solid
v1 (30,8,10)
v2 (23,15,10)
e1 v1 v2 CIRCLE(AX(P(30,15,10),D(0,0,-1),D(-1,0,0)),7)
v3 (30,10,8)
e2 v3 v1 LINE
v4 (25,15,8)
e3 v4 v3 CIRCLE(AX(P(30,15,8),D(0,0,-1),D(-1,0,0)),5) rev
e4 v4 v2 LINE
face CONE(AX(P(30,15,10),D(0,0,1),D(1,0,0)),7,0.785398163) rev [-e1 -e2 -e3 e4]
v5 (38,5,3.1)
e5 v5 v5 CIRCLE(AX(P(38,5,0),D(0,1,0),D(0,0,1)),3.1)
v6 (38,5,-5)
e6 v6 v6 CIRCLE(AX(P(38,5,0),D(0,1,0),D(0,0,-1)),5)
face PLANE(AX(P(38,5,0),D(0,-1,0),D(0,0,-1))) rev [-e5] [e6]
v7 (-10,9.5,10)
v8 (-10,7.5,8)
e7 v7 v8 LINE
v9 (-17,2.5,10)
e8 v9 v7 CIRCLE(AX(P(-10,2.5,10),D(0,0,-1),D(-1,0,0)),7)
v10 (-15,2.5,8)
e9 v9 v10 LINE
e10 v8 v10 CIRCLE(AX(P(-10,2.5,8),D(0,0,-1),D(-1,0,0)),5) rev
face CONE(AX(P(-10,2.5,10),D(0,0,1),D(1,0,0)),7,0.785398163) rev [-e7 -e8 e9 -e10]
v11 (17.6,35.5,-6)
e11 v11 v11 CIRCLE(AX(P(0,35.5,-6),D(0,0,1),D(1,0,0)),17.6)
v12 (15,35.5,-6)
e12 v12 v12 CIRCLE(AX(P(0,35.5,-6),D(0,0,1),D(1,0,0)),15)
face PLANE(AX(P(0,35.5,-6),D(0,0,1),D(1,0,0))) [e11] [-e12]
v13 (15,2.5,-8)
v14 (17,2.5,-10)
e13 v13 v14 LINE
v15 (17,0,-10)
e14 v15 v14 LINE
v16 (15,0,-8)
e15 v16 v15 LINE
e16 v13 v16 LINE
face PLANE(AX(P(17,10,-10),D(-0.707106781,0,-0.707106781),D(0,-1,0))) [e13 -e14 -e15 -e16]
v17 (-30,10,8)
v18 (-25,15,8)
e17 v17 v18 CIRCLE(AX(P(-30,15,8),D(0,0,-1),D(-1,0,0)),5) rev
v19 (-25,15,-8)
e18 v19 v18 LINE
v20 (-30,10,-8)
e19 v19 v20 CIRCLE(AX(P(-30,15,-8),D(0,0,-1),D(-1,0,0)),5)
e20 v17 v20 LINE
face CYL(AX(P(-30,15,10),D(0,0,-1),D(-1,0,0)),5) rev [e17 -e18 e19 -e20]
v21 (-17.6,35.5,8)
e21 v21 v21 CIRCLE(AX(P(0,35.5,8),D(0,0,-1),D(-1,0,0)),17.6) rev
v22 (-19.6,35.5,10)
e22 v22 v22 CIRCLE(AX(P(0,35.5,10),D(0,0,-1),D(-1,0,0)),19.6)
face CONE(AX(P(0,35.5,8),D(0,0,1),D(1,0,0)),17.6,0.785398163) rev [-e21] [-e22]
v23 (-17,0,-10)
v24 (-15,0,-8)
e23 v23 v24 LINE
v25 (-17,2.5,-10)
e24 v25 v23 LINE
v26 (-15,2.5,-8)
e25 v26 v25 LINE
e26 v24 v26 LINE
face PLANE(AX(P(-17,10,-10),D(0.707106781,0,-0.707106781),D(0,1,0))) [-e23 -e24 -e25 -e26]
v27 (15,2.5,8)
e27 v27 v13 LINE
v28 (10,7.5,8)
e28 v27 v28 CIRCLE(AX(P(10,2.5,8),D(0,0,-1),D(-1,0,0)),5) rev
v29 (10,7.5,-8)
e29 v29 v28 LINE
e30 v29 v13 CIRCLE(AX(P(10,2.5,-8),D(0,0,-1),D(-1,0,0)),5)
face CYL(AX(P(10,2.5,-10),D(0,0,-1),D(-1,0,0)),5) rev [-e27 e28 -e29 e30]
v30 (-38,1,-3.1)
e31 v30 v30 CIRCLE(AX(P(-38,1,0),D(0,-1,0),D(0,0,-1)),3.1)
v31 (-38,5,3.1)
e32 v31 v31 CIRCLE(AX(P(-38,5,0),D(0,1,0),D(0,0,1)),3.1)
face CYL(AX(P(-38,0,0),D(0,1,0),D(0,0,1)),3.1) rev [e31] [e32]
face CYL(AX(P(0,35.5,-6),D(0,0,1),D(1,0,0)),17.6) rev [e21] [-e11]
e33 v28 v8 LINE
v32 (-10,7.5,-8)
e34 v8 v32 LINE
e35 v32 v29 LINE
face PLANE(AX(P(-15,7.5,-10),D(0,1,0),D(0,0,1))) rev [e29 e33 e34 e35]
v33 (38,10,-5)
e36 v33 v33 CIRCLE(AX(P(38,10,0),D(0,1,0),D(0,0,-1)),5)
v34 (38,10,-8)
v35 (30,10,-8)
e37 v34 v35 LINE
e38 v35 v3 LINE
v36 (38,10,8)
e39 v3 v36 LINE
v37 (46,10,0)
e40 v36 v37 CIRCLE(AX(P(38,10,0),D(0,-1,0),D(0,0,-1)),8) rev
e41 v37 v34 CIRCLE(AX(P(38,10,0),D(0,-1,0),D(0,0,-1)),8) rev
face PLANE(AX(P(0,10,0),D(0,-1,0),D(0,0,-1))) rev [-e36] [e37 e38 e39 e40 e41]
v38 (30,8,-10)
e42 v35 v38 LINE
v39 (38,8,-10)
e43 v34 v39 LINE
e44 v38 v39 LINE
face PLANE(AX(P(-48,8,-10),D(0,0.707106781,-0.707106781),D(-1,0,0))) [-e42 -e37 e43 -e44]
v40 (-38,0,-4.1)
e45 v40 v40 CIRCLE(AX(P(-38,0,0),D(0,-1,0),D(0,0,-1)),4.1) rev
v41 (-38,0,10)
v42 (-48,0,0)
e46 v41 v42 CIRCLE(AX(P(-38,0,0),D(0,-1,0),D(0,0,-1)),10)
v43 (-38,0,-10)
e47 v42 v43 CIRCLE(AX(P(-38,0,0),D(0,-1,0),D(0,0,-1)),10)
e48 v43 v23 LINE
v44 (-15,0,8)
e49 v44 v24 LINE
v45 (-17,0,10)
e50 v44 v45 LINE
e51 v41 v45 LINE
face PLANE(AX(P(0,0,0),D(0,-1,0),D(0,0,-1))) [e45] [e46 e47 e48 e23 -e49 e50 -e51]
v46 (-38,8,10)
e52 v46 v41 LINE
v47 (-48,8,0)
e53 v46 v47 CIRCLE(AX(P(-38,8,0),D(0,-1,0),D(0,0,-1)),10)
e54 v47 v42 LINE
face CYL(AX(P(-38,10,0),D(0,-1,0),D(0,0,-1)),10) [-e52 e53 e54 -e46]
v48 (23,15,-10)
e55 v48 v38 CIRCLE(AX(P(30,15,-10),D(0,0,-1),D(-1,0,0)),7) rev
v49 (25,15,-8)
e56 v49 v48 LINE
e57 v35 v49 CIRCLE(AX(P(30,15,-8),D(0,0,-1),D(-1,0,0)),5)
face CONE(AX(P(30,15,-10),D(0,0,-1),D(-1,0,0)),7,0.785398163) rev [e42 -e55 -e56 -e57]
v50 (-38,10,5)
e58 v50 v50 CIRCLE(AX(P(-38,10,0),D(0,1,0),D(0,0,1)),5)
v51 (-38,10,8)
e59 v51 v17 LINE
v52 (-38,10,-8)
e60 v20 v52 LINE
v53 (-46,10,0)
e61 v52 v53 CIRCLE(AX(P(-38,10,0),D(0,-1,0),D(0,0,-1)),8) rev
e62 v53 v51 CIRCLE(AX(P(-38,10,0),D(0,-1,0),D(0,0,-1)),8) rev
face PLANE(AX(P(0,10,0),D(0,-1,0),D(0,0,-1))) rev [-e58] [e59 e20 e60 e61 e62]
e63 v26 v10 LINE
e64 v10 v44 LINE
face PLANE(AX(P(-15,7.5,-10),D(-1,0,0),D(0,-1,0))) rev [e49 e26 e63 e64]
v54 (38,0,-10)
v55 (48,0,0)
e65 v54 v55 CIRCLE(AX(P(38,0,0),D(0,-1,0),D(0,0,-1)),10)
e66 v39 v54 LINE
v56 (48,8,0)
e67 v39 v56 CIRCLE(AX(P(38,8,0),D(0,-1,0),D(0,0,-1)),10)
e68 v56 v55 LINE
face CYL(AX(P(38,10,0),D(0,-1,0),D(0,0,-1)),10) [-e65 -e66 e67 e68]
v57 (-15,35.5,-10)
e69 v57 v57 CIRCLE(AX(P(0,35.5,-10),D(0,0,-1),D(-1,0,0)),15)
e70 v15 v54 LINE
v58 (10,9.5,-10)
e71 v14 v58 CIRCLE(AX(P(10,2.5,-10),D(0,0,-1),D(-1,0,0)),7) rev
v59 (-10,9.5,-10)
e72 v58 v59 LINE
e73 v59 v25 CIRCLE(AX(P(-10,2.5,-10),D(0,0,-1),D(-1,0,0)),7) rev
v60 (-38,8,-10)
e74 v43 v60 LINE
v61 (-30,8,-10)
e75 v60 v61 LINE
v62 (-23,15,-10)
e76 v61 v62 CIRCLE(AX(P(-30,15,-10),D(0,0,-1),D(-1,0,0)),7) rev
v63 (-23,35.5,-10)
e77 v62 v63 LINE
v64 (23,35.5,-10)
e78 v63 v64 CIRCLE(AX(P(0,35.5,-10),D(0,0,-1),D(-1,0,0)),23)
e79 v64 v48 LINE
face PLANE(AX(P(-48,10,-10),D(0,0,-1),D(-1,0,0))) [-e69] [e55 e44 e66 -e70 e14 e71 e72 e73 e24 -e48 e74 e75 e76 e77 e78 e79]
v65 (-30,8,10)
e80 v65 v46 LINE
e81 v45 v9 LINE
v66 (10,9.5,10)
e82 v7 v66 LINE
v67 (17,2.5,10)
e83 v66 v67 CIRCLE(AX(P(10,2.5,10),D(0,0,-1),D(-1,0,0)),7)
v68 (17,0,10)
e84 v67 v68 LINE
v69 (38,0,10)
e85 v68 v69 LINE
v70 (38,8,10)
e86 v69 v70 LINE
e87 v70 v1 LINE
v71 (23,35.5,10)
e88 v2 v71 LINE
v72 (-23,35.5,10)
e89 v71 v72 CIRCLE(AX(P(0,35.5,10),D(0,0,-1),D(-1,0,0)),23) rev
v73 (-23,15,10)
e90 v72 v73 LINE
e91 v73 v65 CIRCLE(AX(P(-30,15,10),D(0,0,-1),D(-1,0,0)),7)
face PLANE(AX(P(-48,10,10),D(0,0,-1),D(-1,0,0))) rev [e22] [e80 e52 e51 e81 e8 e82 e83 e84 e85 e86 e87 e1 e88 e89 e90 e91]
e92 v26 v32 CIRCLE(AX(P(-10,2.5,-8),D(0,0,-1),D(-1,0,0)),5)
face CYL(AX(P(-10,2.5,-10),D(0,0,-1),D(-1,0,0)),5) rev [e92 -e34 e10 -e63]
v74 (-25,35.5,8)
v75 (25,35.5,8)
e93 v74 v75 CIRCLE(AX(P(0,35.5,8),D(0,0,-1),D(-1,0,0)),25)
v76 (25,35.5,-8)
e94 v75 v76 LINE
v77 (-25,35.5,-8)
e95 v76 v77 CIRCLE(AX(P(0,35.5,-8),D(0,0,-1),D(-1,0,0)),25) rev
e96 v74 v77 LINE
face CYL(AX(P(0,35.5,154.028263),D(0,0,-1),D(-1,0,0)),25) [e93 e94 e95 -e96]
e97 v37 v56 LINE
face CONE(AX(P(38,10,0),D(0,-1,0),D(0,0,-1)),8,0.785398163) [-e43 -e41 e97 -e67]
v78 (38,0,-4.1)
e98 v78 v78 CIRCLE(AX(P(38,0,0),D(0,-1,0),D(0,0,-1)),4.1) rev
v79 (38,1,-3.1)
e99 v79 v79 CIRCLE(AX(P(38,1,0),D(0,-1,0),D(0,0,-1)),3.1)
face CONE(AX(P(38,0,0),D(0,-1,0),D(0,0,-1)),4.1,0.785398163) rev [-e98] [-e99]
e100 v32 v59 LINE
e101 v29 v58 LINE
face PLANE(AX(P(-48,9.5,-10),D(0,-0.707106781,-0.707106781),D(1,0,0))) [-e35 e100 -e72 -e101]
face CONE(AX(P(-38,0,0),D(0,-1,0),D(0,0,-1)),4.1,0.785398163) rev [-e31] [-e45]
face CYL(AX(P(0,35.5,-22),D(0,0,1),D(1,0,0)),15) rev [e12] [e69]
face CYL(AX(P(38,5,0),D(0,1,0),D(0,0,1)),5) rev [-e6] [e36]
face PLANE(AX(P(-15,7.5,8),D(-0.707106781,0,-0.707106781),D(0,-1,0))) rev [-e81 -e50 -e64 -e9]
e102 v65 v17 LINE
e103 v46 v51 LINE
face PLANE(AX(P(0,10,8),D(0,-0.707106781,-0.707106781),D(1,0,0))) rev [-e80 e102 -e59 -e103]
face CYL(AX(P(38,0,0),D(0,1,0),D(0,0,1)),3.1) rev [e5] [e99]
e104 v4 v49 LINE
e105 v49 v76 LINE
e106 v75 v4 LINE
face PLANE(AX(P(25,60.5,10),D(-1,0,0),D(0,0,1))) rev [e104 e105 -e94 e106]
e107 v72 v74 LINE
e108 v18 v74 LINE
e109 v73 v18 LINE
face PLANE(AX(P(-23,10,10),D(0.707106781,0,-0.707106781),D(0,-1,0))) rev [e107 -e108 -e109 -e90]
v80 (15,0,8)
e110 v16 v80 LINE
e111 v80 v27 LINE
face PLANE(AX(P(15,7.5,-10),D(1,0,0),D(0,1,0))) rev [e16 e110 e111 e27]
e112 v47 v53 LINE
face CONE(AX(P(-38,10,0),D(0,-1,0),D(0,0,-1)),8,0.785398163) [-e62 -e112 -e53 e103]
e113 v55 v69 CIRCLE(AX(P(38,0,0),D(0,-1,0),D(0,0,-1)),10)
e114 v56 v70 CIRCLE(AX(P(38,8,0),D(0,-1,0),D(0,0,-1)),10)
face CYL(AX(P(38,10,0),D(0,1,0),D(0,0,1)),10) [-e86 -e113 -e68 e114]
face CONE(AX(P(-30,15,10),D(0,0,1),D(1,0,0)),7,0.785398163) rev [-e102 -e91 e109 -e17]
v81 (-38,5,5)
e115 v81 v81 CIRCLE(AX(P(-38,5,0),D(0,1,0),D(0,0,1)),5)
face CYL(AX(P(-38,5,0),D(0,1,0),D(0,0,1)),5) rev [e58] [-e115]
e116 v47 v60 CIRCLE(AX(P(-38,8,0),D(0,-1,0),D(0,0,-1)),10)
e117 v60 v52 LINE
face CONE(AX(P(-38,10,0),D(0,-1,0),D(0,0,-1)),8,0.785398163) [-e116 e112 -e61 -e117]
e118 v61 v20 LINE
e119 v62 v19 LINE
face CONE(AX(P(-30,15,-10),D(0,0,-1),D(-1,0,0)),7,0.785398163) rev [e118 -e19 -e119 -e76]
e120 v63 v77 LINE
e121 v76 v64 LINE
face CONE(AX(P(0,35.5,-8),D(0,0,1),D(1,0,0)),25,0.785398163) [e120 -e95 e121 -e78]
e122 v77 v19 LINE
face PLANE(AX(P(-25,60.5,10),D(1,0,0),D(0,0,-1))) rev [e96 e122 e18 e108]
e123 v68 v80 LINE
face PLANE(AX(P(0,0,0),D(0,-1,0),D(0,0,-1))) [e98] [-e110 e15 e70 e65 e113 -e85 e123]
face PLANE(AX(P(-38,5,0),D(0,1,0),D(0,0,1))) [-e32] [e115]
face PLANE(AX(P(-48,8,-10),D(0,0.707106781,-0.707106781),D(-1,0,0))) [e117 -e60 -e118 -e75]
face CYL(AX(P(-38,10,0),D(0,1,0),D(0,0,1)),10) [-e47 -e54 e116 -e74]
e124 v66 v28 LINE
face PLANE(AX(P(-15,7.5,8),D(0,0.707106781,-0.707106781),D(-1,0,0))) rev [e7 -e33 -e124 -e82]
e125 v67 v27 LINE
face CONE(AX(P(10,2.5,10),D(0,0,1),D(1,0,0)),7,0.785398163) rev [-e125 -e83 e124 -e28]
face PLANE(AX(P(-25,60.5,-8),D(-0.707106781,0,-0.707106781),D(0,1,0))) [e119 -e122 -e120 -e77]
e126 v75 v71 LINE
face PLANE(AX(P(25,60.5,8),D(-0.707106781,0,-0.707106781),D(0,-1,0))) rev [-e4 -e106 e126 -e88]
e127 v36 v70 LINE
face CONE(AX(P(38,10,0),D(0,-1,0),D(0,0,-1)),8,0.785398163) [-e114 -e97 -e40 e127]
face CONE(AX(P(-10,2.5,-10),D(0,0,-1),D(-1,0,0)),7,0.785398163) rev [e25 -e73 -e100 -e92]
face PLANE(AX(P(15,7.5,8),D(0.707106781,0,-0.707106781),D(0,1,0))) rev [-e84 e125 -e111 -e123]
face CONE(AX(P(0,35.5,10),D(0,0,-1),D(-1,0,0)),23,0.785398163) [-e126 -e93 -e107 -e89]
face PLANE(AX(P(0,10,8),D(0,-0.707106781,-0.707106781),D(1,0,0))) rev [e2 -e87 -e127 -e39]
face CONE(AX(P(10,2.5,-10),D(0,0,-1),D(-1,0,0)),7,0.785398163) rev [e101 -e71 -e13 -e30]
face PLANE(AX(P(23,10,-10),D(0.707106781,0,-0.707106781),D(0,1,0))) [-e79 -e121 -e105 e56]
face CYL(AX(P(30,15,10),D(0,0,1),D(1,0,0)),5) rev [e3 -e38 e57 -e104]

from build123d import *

# Parameters (mm, degrees)
SKETCH_1_W          = 96
SKETCH_1_H          = 20
EXTRUDE_1_DEPTH     = 10
SKETCH_2_R          = 5
CUT_EXTRUDE_1_DEPTH = 5
FILLET_1_R          = 10
SKETCH_3_R          = 3.1
CUT_EXTRUDE_2_DEPTH = 5
CHAMFER_1_SIZE      = 1
SKETCH_4_W          = 50
SKETCH_4_H          = 20
EXTRUDE_2_DEPTH     = 50.5
CUT_EXTRUDE_START   = -20
CUT_EXTRUDE_4_DEPTH = 20
SKETCH_7_R          = 17.6
CUT_EXTRUDE_5_DEPTH = 16
SKETCH_8_R          = 15
CUT_EXTRUDE_6_DEPTH = 16
CHAMFER_3_SIZE      = 2
FILLET_3_R          = 5
CHAMFER_5_SIZE      = 2
SKETCH_9_W          = 30
SKETCH_9_H          = 15
CUT_EXTRUDE_7_DEPTH = 80.776249598
FILLET_4_R          = 5
CHAMFER_6_SIZE      = 2


# Read off the part's stored shape, not the designer's step: 切除-拉伸4
with BuildPart() as part:
    # 草图1 → 凸台-拉伸1 (new body)
    with BuildSketch(Plane(origin=(0, 0, 0), x_dir=(1, 0, 0), z_dir=(0, 1, 0))):
        Rectangle(SKETCH_1_W, SKETCH_1_H)
    extrude(amount=EXTRUDE_1_DEPTH)

    # 草图2 → 切除-拉伸1 (cut)
    with BuildSketch(Plane(origin=(0, 10, 0), x_dir=(1, 0, 0), z_dir=(0, 1, 0))):
        with Locations(Location((-38, 0, 0), (0, 0, 270))):
            Circle(SKETCH_2_R)
        with Locations(Location((38, 0, 0), (0, 0, 90))):
            Circle(SKETCH_2_R)
    extrude(amount=-CUT_EXTRUDE_1_DEPTH, mode=Mode.SUBTRACT)

    # 圆角1
    fillet_1_edges = [part.edges().sort_by_distance(p)[0] for p in [
        (48, 5, -10),
        (48, 5, 10),
        (-48, 5, 10),
        (-48, 5, -10),
    ]]
    fillet(fillet_1_edges, radius=FILLET_1_R - 0.0001)  # a hair under: the kernel refuses the full size

    # 草图3 → 切除-拉伸2 (cut)
    with BuildSketch(Plane(origin=(0, 5, 0), x_dir=(1, 0, 0), z_dir=(0, 1, 0))):
        with Locations(Location((-38, 0, 0), (0, 0, 270))):
            Circle(SKETCH_3_R)
        with Locations(Location((38, 0, 0), (0, 0, 270))):
            Circle(SKETCH_3_R)
    extrude(amount=-CUT_EXTRUDE_2_DEPTH, mode=Mode.SUBTRACT)

    # 倒角1
    chamfer_1_edges = [part.edges().sort_by_distance(p)[0] for p in [
        (-38, 0, -3.1),
        (38, 0, -3.1),
    ]]
    chamfer(chamfer_1_edges, length=CHAMFER_1_SIZE)

    # 草图4 → 凸台-拉伸2 (add)
    with BuildSketch(Plane(origin=(0, 10, 0), x_dir=(1, 0, 0), z_dir=(0, 1, 0))):
        Rectangle(SKETCH_4_W, SKETCH_4_H)
    extrude(amount=EXTRUDE_2_DEPTH)

    # 切除-拉伸4 outline → 切除-拉伸4 (cut)
    with BuildSketch(Plane.XY.offset(10).offset(CUT_EXTRUDE_START)):
        with BuildLine():
            Line((-25, 60.5), (-25, 35.5))
            ThreePointArc((-25, 35.5), (-17.677669559, 53.1776695), (-8.4e-08, 60.5))
            Line((-8.4e-08, 60.5), (-25, 60.5))
        make_face()
        with BuildLine():
            Line((25, 60.5), (-8.4e-08, 60.5))
            ThreePointArc((-8.4e-08, 60.5), (17.6776695, 53.177669559), (25, 35.5))
            Line((25, 35.5), (25, 60.5))
        make_face()
    extrude(amount=CUT_EXTRUDE_4_DEPTH, mode=Mode.SUBTRACT)

    # 草图7 → 切除-拉伸5 (cut)
    with BuildSketch(Plane.XY.offset(10)):
        with Locations((0, 35.5)):
            Circle(SKETCH_7_R)
    extrude(amount=-CUT_EXTRUDE_5_DEPTH, mode=Mode.SUBTRACT)

    # 草图8 → 切除-拉伸6 (cut)
    with BuildSketch(Plane.XY.offset(-6)):
        with Locations((0, 35.5)):
            Circle(SKETCH_8_R)
    extrude(amount=-CUT_EXTRUDE_6_DEPTH, mode=Mode.SUBTRACT)

    # 倒角3
    chamfer_3_edges = [part.edges().sort_by_distance(p)[0] for p in [
        (-17.6, 35.5, 10),
    ]]
    chamfer(chamfer_3_edges, length=CHAMFER_3_SIZE)

    # 圆角3
    fillet_3_edges = [part.edges().sort_by_distance(p)[0] for p in [
        (25, 10, 0),
        (-25, 10, 0),
    ]]
    fillet(fillet_3_edges, radius=FILLET_3_R)

    # 倒角5
    chamfer_5_edges = [part.edges().sort_by_distance(p)[0] for p in [
        (34.00005, 10, 10),
        (34.00005, 10, -10),
        (26.464466094, 11.464466094, -10),
        (26.464466094, 11.464466094, 10),
        (-26.464466094, 11.464466094, 10),
        (-26.464466094, 11.464466094, -10),
        (-34.00005, 10, -10),
        (-34.00005, 10, 10),
        (-45.071097101, 10, -7.071097101),
        (-45.071097101, 10, 7.071097101),
        (45.071097101, 10, 7.071097101),
        (45.071097101, 10, -7.071097101),
        (-25, 25.25, 10),
        (-25, 25.25, -10),
        (25, 25.25, -10),
        (25, 25.25, 10),
        (17.6776695, 53.177669559, -10),
        (17.6776695, 53.177669559, 10),
    ]]
    chamfer(chamfer_5_edges, length=CHAMFER_5_SIZE)

    # 草图9 → 切除-拉伸7 (cut, through all)
    with BuildSketch(Plane.XY.offset(10)):
        Rectangle(SKETCH_9_W, SKETCH_9_H)
    extrude(amount=-CUT_EXTRUDE_7_DEPTH, mode=Mode.SUBTRACT)

    # 圆角4
    fillet_4_edges = [part.edges().sort_by_distance(p)[0] for p in [
        (15, 7.5, 0),
        (-15, 7.5, 0),
    ]]
    fillet(fillet_4_edges, radius=FILLET_4_R)

    # 倒角6
    chamfer_6_edges = [part.edges().sort_by_distance(p)[0] for p in [
        (15, 1.25, -10),
        (15, 1.25, 10),
        (0, 7.5, 10),
        (0, 7.5, -10),
        (-15, 1.25, -10),
        (-15, 1.25, 10),
        (13.535533906, 6.035533906, 10),
        (13.535533906, 6.035533906, -10),
        (-13.535533906, 6.035533906, 10),
        (-13.535533906, 6.035533906, -10),
    ]]
    chamfer(chamfer_6_edges, length=CHAMFER_6_SIZE)


solid = part.part
